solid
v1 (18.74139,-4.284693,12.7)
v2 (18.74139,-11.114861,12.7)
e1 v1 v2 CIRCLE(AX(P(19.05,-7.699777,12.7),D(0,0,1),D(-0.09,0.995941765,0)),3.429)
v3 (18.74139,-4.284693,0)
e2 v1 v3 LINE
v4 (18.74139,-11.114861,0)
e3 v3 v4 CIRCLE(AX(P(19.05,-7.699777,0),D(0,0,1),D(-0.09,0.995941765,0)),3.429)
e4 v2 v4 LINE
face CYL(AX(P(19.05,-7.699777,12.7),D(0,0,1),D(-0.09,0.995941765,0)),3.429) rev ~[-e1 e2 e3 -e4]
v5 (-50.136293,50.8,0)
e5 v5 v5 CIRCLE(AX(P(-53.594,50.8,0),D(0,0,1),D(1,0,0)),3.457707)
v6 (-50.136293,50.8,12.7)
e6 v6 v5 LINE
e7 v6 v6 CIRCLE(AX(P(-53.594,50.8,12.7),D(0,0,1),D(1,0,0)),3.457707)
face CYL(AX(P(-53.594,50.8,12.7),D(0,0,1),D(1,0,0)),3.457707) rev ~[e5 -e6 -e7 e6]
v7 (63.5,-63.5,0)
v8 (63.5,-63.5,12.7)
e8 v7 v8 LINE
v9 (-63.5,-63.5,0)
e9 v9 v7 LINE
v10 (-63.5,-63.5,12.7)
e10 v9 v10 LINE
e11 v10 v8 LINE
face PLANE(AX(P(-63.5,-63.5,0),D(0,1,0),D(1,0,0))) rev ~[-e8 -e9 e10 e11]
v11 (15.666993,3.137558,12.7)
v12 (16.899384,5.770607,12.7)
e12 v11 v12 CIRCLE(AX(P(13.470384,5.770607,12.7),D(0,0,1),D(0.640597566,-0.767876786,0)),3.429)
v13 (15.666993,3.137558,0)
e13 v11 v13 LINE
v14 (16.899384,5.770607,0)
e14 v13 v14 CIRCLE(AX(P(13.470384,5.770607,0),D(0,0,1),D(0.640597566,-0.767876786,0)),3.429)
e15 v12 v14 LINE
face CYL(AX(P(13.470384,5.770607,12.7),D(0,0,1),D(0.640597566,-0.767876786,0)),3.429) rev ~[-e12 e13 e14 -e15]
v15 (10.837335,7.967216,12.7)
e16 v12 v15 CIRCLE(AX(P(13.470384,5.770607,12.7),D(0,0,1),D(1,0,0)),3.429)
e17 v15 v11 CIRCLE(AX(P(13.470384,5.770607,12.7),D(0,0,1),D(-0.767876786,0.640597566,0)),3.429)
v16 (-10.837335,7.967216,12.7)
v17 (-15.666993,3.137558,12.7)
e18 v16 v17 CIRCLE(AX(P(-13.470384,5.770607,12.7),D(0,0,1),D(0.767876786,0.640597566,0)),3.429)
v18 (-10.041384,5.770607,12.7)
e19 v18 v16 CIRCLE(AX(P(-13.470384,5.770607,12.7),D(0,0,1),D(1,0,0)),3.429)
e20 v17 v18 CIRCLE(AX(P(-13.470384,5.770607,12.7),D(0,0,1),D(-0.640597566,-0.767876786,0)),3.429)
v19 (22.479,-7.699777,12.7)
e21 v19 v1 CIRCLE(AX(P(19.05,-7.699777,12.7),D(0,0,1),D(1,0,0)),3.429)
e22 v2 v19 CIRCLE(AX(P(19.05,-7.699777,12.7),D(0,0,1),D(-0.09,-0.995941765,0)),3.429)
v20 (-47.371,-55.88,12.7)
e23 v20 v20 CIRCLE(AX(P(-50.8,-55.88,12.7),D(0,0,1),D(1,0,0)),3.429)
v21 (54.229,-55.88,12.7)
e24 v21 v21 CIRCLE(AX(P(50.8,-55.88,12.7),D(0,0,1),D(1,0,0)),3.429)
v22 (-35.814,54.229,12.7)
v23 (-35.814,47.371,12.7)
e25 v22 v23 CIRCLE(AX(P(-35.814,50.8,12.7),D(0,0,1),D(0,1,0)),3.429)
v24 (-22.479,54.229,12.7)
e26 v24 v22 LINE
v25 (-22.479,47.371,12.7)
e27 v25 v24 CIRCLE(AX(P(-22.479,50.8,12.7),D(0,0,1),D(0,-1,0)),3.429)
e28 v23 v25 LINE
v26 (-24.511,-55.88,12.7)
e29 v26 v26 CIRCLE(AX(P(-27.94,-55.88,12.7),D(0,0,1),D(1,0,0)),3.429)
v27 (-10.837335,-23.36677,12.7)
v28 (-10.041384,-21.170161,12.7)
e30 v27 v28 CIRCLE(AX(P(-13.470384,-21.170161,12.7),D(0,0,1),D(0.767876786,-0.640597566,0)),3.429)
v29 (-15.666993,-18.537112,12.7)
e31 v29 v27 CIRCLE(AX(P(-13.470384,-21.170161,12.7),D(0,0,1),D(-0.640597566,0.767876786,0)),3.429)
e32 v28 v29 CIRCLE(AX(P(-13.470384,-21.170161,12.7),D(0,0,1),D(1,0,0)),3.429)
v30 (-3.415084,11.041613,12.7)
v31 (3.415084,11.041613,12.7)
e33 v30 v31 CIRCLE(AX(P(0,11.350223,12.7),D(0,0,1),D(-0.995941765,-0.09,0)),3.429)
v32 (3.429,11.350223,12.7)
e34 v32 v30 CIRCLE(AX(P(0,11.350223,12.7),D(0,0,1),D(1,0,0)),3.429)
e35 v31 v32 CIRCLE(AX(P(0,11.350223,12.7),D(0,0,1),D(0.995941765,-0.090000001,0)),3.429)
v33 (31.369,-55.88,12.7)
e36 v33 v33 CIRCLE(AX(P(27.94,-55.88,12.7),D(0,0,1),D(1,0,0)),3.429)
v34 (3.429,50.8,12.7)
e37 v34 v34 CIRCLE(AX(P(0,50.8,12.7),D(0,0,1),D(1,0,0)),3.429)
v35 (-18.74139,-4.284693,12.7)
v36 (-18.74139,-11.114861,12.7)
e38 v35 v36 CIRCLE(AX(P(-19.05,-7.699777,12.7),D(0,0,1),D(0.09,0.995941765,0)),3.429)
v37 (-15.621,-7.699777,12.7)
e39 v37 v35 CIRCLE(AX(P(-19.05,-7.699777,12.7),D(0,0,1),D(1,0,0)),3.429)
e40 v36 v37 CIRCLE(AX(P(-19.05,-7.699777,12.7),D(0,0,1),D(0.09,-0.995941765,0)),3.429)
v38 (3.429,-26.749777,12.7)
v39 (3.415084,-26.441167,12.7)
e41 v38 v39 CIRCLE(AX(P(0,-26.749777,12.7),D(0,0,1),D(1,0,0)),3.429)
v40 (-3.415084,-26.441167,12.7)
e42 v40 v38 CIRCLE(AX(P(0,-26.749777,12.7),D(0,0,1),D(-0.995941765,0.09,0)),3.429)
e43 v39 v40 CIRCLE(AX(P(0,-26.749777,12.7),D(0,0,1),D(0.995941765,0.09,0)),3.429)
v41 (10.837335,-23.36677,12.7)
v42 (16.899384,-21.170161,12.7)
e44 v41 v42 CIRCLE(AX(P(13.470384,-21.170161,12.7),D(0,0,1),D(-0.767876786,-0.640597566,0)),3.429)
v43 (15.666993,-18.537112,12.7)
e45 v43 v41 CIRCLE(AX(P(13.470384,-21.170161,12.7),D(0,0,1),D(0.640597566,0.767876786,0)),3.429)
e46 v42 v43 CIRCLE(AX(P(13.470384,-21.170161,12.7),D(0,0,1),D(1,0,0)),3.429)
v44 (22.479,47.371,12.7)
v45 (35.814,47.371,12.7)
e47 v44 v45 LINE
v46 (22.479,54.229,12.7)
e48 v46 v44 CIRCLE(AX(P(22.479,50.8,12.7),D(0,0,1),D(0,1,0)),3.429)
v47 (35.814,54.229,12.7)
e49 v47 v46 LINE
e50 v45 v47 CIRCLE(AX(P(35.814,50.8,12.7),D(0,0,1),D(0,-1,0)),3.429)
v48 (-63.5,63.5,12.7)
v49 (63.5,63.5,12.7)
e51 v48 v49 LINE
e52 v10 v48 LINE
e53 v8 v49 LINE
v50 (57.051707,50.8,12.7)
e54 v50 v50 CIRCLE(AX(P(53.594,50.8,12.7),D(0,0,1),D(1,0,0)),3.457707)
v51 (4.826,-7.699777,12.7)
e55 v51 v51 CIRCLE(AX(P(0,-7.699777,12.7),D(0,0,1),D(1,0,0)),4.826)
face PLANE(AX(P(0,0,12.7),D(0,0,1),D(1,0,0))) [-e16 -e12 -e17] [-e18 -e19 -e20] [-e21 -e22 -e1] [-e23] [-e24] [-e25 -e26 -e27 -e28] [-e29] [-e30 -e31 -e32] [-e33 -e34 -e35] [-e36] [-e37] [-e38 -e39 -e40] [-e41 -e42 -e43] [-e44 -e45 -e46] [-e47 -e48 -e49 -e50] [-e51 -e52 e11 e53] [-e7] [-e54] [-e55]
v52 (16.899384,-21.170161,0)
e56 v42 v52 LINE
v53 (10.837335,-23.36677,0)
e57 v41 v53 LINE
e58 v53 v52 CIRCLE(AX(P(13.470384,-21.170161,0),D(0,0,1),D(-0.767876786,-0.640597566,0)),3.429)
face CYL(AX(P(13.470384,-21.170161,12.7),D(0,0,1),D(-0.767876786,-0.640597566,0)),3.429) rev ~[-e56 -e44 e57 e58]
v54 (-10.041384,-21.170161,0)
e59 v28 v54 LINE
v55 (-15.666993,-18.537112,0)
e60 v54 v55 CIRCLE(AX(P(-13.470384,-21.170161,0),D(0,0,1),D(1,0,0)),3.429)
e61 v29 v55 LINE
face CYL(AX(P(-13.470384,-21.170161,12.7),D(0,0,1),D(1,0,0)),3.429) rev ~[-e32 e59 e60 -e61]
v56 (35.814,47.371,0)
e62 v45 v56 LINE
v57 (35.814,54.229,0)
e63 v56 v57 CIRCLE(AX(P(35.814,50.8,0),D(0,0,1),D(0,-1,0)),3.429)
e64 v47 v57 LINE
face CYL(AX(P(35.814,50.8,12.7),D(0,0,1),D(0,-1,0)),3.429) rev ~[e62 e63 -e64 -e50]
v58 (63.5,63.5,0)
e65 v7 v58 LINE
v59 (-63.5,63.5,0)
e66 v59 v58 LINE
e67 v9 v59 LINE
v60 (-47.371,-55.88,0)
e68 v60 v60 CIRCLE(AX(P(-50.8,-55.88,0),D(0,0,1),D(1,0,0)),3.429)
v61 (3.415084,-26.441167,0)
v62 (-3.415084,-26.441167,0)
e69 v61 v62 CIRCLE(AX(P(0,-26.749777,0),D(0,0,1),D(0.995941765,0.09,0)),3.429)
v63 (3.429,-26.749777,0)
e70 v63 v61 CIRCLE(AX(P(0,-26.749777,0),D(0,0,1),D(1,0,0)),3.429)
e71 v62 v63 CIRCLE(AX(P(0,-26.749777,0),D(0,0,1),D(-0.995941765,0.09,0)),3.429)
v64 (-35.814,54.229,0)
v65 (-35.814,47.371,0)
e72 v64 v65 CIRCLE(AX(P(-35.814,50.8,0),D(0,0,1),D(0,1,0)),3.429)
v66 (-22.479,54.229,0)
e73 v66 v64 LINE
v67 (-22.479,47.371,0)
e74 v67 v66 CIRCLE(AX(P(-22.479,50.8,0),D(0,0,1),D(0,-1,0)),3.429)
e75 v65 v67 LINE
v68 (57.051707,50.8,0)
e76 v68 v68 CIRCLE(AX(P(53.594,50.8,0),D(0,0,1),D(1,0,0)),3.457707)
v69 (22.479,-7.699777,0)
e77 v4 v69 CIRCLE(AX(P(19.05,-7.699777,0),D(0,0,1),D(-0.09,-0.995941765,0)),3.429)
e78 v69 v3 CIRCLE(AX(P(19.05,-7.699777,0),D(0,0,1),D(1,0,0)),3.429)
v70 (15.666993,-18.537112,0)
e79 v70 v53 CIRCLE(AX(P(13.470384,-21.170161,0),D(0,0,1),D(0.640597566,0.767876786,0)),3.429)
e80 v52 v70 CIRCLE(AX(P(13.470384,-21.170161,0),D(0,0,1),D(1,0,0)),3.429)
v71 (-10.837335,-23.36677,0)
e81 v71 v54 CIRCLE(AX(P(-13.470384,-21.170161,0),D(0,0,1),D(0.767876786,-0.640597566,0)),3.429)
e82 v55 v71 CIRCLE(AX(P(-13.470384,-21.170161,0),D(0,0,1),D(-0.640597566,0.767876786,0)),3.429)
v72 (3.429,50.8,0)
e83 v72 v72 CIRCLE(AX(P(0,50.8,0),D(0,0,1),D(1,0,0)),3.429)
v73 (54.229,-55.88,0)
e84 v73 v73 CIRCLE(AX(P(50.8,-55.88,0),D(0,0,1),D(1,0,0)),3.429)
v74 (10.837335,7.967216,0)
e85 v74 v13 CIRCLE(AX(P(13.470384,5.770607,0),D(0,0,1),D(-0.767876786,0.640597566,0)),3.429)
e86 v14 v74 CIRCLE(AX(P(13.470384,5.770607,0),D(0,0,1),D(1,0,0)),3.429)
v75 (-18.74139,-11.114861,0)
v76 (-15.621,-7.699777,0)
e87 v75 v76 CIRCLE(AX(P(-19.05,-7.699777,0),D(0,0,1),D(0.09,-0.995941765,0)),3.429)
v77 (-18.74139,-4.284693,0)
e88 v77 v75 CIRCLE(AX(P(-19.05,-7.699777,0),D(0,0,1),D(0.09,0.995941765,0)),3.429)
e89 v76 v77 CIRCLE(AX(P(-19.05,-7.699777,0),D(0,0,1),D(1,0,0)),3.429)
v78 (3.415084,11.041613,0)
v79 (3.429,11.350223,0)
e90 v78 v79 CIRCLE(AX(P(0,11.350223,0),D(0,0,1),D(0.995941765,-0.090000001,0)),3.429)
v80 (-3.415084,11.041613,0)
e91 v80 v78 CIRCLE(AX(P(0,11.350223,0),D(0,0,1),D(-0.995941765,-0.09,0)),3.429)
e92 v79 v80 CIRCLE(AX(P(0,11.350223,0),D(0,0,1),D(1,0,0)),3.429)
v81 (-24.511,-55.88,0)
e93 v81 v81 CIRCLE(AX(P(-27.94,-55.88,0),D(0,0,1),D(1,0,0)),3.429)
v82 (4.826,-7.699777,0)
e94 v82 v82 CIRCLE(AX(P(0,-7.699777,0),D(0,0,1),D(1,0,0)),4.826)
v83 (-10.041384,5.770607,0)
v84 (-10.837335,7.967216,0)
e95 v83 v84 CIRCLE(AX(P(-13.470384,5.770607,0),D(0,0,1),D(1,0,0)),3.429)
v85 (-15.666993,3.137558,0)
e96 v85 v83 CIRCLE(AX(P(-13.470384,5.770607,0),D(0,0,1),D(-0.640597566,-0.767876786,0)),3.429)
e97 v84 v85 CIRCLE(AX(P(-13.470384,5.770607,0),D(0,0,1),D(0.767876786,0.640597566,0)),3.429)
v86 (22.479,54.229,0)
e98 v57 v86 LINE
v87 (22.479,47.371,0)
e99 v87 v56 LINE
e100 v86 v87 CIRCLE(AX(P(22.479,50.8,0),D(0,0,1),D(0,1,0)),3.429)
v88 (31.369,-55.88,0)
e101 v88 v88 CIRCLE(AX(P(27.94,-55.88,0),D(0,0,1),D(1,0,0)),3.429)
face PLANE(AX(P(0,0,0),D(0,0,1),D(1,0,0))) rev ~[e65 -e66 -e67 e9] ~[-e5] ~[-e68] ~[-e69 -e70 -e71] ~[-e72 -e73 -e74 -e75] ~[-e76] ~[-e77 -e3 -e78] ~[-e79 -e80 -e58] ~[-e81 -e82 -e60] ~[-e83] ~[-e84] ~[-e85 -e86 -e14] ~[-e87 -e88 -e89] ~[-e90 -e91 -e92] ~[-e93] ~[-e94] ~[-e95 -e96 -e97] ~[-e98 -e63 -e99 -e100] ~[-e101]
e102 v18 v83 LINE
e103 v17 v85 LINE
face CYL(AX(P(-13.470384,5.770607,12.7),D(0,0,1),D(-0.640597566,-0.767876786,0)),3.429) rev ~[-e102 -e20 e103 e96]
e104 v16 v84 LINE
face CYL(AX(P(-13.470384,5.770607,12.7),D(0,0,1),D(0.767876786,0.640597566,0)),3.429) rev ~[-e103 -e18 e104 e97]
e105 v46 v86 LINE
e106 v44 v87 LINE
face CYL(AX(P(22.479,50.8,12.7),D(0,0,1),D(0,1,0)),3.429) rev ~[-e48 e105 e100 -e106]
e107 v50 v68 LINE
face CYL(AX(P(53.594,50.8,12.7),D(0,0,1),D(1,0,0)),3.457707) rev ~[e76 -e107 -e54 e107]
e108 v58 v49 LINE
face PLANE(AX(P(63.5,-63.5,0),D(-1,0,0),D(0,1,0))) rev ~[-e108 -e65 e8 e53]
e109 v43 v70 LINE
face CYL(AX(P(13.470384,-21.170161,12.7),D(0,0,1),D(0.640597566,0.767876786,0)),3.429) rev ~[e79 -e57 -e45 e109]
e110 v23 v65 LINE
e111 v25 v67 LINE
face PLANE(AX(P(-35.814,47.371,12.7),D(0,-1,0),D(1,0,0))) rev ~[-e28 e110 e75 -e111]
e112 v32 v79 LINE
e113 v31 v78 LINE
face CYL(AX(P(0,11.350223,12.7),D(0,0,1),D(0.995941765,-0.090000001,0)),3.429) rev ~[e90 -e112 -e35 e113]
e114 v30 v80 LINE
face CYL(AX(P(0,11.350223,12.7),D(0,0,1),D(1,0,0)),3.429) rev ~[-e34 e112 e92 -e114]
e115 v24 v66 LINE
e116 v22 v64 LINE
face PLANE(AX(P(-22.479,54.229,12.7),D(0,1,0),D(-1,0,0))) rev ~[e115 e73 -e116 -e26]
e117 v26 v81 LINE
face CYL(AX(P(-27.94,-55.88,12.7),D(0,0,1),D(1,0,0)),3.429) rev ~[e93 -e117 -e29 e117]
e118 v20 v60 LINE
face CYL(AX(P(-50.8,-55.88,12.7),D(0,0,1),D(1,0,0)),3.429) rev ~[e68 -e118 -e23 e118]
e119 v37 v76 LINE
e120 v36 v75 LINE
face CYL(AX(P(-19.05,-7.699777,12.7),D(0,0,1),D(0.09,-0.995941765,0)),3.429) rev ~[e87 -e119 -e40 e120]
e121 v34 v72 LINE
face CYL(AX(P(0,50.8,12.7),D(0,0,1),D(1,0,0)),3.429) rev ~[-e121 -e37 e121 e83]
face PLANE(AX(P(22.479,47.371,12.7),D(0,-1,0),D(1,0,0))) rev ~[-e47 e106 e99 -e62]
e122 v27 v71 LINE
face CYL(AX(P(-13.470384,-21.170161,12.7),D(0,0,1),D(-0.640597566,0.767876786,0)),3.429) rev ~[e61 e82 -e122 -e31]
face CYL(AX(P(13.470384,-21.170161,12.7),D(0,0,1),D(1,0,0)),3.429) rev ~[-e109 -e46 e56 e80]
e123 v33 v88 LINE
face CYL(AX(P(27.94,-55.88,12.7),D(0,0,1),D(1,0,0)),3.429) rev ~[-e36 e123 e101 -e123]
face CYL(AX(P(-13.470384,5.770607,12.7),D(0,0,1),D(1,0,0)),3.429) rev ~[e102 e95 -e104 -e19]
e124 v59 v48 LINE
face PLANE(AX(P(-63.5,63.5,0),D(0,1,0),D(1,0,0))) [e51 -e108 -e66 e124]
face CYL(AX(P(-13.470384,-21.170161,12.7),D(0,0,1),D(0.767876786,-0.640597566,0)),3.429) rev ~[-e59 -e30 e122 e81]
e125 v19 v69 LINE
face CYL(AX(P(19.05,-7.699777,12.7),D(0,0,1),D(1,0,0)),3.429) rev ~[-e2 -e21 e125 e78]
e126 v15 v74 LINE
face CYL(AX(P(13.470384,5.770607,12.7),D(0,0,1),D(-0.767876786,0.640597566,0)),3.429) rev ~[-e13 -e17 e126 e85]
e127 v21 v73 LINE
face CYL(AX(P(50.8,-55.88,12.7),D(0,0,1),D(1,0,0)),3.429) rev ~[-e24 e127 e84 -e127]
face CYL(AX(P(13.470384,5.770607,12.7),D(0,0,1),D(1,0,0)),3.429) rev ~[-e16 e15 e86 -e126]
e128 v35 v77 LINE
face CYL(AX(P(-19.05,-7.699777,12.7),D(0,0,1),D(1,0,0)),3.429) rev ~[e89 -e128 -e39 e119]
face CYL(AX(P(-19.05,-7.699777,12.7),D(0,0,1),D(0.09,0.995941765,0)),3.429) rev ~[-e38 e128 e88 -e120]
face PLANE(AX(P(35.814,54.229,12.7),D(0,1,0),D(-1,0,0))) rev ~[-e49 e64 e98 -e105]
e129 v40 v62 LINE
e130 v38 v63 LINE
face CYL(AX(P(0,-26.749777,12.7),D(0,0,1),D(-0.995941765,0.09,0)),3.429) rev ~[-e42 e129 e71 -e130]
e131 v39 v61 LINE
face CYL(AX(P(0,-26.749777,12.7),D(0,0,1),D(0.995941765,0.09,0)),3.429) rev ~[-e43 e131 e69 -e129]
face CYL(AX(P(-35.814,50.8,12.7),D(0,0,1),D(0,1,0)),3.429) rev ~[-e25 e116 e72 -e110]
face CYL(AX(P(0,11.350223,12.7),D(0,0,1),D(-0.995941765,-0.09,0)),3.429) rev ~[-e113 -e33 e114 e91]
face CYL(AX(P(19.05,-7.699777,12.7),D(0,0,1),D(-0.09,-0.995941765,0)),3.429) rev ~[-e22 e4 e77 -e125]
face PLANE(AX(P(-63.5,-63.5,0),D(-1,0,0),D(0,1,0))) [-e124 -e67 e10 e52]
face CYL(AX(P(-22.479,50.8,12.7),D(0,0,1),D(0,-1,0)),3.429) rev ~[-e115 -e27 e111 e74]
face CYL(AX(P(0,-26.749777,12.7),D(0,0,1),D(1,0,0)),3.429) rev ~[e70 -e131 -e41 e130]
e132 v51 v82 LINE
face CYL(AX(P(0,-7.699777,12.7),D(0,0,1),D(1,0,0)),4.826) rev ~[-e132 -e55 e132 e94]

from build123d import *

# Parameters (mm, degrees)
F0_W     = 127
F0_H     = 127
F1_DEPTH = 12.7
F2_R     = 4.826
F3_DEPTH = 25.4
F4_R     = 3.429
F4_R_2   = 3.4577066483
F5_DEPTH = 25.4


# Not quite as in the source:
# - a feature names something its author has since deleted; it is built from what else it names


with BuildPart() as f1:
    # F0 (on Top) → F1 (new body)
    with BuildSketch(Plane.XY):
        Rectangle(F0_W, F0_H)
    extrude(amount=F1_DEPTH)

    # F2 (on face) → F3 (cut)
    with BuildSketch(Plane.XY.offset(12.7)):
        with BuildLine():
            ThreePointArc((-10.8373346815, 7.9672162229), (-15.8950533343, 8.195276323), (-15.6669932342, 3.1375576702))
            ThreePointArc((-15.6669932342, 3.1375576702), (-12.0167906073, 2.664949958), (-10.0413841816, 5.7706071703))
            ThreePointArc((-10.0413841816, 5.7706071703), (-10.2465070332, 6.9387925717), (-10.8373346815, 7.9672162229))
        make_face()
        with BuildLine():
            ThreePointArc((3.429, 11.3502229887), (-0.1544617901, 14.7757423005), (-3.4150843134, 11.0416129887))
            ThreePointArc((-3.4150843134, 11.0416129887), (0, 7.9212229887), (3.4150843134, 11.0416129887))
            ThreePointArc((3.4150843134, 11.0416129887), (3.4255193118, 11.1957611986), (3.429, 11.3502229887))
        make_face()
        with BuildLine():
            ThreePointArc((16.8993841816, 5.7706071703), (14.638569583, 8.9944843187), (10.8373346815, 7.9672162229))
            ThreePointArc((10.8373346815, 7.9672162229), (11.0457150289, 3.3459380176), (15.6669932342, 3.1375576702))
            ThreePointArc((15.6669932342, 3.1375576702), (16.576041394, 4.317013596), (16.8993841816, 5.7706071703))
        make_face()
        with BuildLine():
            ThreePointArc((22.479, -7.6997770113), (21.3629869552, -5.1683480976), (18.74139, -4.2846926978))
            ThreePointArc((18.74139, -4.2846926978), (15.621, -7.6997770113), (18.74139, -11.1148613247))
            ThreePointArc((18.74139, -11.1148613247), (21.3629869552, -10.231205925), (22.479, -7.6997770113))
        make_face()
        with BuildLine():
            ThreePointArc((15.6669932342, -18.5371116928), (11.0457150289, -18.7454920402), (10.8373346815, -23.3667702455))
            ThreePointArc((10.8373346815, -23.3667702455), (14.638569583, -24.3940383413), (16.8993841816, -21.1701611929))
            ThreePointArc((16.8993841816, -21.1701611929), (16.576041394, -19.7165676186), (15.6669932342, -18.5371116928))
        make_face()
        with BuildLine():
            ThreePointArc((3.4150843134, -26.4411670113), (0, -23.3207770113), (-3.4150843134, -26.4411670113))
            ThreePointArc((-3.4150843134, -26.4411670113), (-0.1544617901, -30.1752963231), (3.429, -26.7497770113))
            ThreePointArc((3.429, -26.7497770113), (3.4255193118, -26.5953152212), (3.4150843134, -26.4411670113))
        make_face()
        with BuildLine():
            ThreePointArc((-10.0413841816, -21.1701611929), (-12.0167906073, -18.0645039805), (-15.6669932342, -18.5371116928))
            ThreePointArc((-15.6669932342, -18.5371116928), (-15.8950533343, -23.5948303456), (-10.8373346815, -23.3667702455))
            ThreePointArc((-10.8373346815, -23.3667702455), (-10.2465070332, -22.3383465943), (-10.0413841816, -21.1701611929))
        make_face()
        with BuildLine():
            ThreePointArc((-15.621, -7.6997770113), (-16.5185710863, -5.3867900561), (-18.74139, -4.2846926978))
            ThreePointArc((-18.74139, -4.2846926978), (-22.479, -7.6997770113), (-18.74139, -11.1148613247))
            ThreePointArc((-18.74139, -11.1148613247), (-16.5185710863, -10.0127639665), (-15.621, -7.6997770113))
        make_face()
        with Locations((0, -7.6997770113)):
            Circle(F2_R)
    extrude(amount=-F3_DEPTH, mode=Mode.SUBTRACT)

    # F4 (on face) → F5 (cut)
    with BuildSketch(Plane.XY.offset(12.7)):
        with Locations((0, 50.8)):
            Circle(F4_R)
        with Locations((27.94, -55.88)):
            Circle(F4_R)
        with Locations((50.8, -55.88)):
            Circle(F4_R)
        with Locations((-50.8, -55.88)):
            Circle(F4_R)
        with Locations((-27.94, -55.88)):
            Circle(F4_R)
        with Locations((-53.594, 50.8)):
            Circle(F4_R_2)
        with Locations((53.594, 50.8)):
            Circle(F4_R_2)
        with BuildLine():
            Line((-22.479, 54.229), (-35.814, 54.229))
            ThreePointArc((-35.814, 54.229), (-39.243, 50.8), (-35.814, 47.371))
            Line((-35.814, 47.371), (-22.479, 47.371))
            ThreePointArc((-22.479, 47.371), (-19.05, 50.8), (-22.479, 54.229))
        make_face()
        with BuildLine():
            ThreePointArc((35.814, 47.371), (39.243, 50.8), (35.814, 54.229))
            Line((35.814, 54.229), (22.479, 54.229))
            ThreePointArc((22.479, 54.229), (19.05, 50.8), (22.479, 47.371))
            Line((22.479, 47.371), (35.814, 47.371))
        make_face()
    extrude(amount=-F5_DEPTH, mode=Mode.SUBTRACT)


solid = f1.part
